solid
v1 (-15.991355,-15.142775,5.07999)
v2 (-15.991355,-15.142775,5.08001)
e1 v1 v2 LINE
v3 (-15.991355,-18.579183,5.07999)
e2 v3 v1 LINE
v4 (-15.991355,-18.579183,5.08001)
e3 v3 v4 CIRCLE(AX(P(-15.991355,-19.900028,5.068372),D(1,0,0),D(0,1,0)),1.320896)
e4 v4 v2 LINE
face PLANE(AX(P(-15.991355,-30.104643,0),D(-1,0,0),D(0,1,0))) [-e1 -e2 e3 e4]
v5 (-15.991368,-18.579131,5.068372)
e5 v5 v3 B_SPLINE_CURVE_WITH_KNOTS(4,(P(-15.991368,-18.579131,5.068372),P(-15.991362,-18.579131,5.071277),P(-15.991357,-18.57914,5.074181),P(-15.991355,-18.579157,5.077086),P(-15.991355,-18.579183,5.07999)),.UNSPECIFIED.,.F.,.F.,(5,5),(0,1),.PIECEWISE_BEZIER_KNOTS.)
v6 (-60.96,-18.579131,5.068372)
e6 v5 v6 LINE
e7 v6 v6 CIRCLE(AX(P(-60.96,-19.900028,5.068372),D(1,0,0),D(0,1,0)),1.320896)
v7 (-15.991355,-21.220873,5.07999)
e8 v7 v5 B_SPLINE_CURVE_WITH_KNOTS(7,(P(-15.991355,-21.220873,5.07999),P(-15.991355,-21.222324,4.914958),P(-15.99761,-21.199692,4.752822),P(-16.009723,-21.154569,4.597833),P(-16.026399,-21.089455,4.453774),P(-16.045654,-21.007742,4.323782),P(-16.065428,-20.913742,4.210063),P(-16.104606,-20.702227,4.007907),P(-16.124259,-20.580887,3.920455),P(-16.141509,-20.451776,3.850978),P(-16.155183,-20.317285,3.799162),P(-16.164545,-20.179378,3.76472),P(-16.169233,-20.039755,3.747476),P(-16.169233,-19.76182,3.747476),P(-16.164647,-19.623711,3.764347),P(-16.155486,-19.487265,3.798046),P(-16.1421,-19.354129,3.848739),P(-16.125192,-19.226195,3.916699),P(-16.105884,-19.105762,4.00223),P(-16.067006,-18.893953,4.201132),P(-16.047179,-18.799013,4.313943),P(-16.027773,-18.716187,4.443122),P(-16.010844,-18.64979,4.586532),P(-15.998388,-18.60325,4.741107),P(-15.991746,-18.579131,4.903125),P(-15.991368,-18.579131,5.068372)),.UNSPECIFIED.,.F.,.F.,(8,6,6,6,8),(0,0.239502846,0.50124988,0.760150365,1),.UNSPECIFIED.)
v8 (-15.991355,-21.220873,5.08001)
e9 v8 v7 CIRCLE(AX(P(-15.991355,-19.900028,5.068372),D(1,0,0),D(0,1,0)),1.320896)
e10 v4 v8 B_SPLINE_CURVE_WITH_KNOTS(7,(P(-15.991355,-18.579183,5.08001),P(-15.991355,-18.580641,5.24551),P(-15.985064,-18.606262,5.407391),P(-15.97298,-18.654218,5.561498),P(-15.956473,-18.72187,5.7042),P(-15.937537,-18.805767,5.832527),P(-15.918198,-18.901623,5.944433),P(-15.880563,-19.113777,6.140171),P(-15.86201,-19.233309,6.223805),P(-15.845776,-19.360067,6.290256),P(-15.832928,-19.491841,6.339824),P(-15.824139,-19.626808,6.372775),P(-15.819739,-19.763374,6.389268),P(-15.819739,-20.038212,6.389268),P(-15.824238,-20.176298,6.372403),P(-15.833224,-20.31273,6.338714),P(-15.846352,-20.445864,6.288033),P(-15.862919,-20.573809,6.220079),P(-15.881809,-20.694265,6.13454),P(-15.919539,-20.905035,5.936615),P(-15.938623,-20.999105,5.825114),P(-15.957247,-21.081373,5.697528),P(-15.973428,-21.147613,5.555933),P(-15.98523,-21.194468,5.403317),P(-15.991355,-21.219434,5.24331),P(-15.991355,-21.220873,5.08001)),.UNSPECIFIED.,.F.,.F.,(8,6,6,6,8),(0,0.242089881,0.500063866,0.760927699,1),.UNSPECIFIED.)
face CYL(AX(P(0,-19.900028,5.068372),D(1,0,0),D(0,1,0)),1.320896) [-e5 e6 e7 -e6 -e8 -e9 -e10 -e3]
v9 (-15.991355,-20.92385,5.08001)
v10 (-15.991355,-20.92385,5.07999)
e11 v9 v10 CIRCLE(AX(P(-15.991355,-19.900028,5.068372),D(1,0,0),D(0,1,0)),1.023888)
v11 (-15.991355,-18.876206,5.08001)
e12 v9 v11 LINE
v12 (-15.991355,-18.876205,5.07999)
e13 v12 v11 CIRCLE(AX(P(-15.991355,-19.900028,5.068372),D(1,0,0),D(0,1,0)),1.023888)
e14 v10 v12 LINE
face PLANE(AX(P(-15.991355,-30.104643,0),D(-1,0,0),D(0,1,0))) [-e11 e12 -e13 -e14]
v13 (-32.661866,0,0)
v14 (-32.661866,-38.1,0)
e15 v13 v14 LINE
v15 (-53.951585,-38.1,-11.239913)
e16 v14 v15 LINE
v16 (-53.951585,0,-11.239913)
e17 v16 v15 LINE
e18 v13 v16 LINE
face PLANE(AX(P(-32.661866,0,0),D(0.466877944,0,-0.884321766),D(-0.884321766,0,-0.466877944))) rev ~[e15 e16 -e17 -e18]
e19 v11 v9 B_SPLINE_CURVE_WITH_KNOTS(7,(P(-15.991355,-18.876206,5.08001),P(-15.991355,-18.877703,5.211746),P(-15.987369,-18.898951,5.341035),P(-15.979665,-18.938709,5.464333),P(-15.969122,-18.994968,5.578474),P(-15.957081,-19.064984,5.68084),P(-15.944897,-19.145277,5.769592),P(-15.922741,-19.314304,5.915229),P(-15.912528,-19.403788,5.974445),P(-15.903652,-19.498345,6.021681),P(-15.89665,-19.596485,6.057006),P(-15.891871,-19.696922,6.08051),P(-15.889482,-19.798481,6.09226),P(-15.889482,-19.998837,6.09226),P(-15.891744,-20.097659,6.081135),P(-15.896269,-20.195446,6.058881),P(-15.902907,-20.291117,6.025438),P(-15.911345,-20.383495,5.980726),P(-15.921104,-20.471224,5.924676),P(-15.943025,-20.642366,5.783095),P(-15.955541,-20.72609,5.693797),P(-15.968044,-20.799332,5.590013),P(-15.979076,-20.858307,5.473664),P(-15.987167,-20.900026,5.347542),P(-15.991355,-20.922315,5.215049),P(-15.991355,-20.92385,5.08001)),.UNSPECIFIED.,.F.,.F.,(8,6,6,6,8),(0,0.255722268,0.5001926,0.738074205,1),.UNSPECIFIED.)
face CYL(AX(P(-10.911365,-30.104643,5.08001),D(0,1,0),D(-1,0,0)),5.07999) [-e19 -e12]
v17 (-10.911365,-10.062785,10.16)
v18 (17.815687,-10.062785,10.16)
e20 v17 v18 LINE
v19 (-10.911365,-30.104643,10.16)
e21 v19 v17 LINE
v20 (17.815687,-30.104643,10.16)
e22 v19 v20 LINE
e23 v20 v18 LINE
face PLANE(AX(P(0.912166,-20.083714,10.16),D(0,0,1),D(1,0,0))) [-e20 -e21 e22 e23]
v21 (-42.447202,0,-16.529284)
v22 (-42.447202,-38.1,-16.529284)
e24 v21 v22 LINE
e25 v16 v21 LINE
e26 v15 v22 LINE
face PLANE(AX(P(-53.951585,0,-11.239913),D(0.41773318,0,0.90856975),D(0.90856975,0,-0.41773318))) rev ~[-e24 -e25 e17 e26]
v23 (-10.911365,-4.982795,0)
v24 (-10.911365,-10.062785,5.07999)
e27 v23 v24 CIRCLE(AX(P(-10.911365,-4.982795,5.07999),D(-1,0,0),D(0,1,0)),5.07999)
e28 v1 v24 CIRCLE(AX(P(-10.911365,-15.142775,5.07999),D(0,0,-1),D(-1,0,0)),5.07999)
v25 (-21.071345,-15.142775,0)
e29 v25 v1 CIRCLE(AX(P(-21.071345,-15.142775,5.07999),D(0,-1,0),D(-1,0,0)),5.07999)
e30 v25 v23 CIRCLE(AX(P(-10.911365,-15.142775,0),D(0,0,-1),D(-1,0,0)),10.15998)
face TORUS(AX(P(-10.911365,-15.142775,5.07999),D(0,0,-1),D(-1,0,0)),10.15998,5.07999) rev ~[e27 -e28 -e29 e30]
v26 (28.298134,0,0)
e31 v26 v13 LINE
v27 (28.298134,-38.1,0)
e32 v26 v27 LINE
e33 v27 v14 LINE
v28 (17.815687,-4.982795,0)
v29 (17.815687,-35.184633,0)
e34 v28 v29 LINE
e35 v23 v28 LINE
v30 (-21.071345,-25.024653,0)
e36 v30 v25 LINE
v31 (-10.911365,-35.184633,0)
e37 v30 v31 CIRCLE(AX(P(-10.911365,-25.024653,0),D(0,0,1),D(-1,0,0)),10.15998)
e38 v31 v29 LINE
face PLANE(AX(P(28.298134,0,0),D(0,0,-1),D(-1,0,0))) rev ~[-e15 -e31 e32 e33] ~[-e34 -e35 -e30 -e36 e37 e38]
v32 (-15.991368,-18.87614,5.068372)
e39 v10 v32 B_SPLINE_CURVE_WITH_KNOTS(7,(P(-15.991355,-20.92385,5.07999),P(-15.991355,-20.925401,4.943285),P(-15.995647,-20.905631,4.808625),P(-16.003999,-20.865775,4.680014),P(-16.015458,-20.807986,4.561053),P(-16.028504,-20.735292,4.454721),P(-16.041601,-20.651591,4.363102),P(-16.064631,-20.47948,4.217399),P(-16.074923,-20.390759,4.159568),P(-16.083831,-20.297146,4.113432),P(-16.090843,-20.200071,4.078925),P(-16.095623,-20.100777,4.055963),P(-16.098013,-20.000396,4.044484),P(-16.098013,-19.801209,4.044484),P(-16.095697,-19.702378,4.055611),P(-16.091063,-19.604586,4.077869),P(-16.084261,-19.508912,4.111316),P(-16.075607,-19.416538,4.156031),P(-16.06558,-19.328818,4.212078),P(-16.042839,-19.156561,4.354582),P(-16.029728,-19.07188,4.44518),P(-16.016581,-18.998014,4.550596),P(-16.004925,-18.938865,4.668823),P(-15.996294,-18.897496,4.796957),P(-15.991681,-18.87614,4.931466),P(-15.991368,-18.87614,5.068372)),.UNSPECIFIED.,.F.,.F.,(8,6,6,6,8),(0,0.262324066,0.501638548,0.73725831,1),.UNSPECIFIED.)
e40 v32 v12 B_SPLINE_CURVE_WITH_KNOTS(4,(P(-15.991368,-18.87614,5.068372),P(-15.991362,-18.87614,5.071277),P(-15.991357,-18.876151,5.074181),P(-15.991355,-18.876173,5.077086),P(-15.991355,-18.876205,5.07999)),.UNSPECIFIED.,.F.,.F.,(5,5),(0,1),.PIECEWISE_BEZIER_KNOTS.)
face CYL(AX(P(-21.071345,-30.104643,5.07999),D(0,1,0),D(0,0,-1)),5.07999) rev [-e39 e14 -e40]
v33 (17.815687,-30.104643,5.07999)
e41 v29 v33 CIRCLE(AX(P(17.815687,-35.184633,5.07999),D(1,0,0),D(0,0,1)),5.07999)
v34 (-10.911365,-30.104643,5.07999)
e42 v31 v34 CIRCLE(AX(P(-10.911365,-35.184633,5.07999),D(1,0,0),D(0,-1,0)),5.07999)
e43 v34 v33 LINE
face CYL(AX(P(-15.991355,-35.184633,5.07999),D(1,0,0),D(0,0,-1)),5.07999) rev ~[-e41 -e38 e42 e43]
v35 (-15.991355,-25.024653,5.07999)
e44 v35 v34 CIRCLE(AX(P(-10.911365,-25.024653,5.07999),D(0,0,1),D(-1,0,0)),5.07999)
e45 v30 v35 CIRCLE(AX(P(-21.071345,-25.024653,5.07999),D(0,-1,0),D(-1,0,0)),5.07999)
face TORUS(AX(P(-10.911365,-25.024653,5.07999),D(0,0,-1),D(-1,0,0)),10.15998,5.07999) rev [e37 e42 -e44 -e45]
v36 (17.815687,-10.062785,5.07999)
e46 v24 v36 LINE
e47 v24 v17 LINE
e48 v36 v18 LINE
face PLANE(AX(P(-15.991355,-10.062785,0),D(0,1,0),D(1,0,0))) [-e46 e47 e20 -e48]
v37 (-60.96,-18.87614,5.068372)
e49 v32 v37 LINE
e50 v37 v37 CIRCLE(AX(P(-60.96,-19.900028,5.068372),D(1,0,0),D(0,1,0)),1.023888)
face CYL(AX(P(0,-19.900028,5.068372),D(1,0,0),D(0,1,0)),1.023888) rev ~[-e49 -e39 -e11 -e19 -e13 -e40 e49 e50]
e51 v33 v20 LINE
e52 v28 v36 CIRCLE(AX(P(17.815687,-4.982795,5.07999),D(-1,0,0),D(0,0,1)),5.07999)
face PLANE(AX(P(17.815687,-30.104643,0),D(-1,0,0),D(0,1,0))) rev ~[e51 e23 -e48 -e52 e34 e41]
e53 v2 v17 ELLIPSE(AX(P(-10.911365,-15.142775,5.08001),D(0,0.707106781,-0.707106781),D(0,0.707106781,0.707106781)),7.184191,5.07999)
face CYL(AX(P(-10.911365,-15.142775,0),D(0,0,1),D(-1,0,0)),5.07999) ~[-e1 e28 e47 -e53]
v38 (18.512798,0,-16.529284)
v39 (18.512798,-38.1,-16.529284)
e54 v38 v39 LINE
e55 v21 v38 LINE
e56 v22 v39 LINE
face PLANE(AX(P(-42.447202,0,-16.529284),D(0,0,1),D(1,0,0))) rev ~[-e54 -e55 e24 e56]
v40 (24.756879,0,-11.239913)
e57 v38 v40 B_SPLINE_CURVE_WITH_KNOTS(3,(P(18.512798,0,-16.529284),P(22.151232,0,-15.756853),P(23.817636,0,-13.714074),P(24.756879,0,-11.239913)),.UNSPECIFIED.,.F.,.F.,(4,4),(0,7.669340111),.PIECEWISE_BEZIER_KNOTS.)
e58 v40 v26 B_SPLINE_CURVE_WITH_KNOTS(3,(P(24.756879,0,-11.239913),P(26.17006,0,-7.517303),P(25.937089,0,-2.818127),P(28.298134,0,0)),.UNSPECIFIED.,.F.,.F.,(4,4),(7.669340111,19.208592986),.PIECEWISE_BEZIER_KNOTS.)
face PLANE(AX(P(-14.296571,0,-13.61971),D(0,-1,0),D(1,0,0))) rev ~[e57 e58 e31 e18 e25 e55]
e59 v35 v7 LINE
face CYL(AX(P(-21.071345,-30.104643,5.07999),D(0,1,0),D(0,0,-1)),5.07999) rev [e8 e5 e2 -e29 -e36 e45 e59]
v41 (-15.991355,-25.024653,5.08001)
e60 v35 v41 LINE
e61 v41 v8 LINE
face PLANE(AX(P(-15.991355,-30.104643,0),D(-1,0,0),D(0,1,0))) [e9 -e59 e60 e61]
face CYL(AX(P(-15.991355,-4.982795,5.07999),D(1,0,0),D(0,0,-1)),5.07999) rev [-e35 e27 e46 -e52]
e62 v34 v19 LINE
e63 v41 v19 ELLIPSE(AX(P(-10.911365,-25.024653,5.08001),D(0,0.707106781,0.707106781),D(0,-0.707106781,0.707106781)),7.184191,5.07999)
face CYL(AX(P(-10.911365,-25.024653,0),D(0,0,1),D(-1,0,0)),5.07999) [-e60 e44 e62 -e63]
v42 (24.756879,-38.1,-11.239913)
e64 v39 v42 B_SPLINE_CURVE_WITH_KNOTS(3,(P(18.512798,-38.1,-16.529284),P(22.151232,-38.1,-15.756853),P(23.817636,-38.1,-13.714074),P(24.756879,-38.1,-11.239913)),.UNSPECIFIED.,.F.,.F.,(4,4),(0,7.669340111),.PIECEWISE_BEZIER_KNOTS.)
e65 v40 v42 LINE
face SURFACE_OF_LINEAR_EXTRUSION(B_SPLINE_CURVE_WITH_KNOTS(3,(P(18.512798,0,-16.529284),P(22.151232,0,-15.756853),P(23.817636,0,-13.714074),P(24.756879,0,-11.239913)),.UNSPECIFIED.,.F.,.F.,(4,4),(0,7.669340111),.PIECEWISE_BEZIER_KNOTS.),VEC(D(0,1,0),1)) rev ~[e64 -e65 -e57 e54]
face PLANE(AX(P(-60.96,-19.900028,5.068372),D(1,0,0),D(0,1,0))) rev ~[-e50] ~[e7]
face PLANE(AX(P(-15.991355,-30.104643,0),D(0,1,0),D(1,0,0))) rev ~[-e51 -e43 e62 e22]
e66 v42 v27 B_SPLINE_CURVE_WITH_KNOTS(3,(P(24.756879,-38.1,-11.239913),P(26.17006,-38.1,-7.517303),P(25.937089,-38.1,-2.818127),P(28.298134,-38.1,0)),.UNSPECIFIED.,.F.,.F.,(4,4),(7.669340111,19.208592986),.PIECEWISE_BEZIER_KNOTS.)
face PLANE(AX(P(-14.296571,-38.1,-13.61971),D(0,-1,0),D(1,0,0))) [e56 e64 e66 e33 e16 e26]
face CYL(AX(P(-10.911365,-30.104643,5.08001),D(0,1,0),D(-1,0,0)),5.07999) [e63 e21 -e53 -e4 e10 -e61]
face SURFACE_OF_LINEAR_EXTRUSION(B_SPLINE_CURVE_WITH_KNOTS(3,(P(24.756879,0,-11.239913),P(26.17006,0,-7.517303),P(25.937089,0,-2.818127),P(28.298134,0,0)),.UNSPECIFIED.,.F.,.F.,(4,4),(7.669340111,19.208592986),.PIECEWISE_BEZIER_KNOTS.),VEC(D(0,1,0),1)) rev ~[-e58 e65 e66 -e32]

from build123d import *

# Parameters (mm, degrees)
F1_DEPTH = 38.1
F2_W     = 33.8070421275
F2_H     = 20.0418584555
F3_DEPTH = 10.16
F4_R     = 5.07999
F5_R     = 1.3208962066
F5_R_2   = 1.0238880826
F6_DEPTH = 60.96


# Not quite as in the source:
# - a fillet or chamfer is up to 0.001 mm smaller than in the source, because OpenCascade refuses the exact size
# - a feature names something its author has since deleted; it is built from what else it names


with BuildPart() as f1:
    # F0 (on Front) → F1 (new body)
    with BuildSketch(Plane.XZ):
        with BuildLine():
            Line((24.7568794588, -11.2399134781), (-53.9515846949, -11.2399134781))
            Line((-53.9515846949, -11.2399134781), (-42.4472021085, -16.5292843043))
            Line((-42.4472021085, -16.5292843043), (18.5127978915, -16.5292843043))
            add(Edge.make_bspline(
                [(18.5127978915, -16.5292843043), (22.1512323361, -15.7568533336), (23.817636294, -13.7140743109), (24.7568794588, -11.2399134781)],
                knots=[0, 0, 0, 0, 7.6693401108, 7.6693401108, 7.6693401108, 7.6693401108], degree=3))
        make_face()
        with BuildLine():
            Line((-32.6618658911, 0), (-53.9515846949, -11.2399134781))
            Line((-53.9515846949, -11.2399134781), (24.7568794588, -11.2399134781))
            add(Edge.make_bspline(
                [(24.7568794588, -11.2399134781), (26.1700602844, -7.5173027852), (25.9370894642, -2.8181269591), (28.2981341089, 0)],
                knots=[7.6693401108, 7.6693401108, 7.6693401108, 7.6693401108, 19.2085929859, 19.2085929859, 19.2085929859, 19.2085929859], degree=3))
            Line((28.2981341089, 0), (-32.6618658911, 0))
        make_face()
    extrude(amount=F1_DEPTH)

    # F2 (on Top) → F3 (join)
    with BuildSketch(Plane.XY):
        with Locations((0.9121662006, -20.0837139437)):
            Rectangle(F2_W, F2_H)
    extrude(amount=F3_DEPTH)

    # F4 (radius 5.08 in the source; OpenCascade refuses exactly that, so slightly less here)
    f4_edges = [f1.edges().sort_by_distance(p)[0] for p in [
        (-15.991355, -10.062785, 5.08),
        (-15.991355, -30.104643, 5.08),
        (-15.991355, -20.083714, 0),
        (-15.991355, -20.083714, 10.16),
        (0.912166, -30.104643, 0),
        (0.912166, -10.062785, 0),
    ]]
    fillet(f4_edges, radius=F4_R)

    # F5 (on Right) → F6 (join)
    with BuildSketch(Plane.YZ):
        with Locations((-19.9000276625, 5.0683720037)):
            Circle(F5_R)
        with Locations((-19.9000276625, 5.0683720037)):
            Circle(F5_R_2, mode=Mode.SUBTRACT)
    extrude(amount=-F6_DEPTH)


solid = f1.part
